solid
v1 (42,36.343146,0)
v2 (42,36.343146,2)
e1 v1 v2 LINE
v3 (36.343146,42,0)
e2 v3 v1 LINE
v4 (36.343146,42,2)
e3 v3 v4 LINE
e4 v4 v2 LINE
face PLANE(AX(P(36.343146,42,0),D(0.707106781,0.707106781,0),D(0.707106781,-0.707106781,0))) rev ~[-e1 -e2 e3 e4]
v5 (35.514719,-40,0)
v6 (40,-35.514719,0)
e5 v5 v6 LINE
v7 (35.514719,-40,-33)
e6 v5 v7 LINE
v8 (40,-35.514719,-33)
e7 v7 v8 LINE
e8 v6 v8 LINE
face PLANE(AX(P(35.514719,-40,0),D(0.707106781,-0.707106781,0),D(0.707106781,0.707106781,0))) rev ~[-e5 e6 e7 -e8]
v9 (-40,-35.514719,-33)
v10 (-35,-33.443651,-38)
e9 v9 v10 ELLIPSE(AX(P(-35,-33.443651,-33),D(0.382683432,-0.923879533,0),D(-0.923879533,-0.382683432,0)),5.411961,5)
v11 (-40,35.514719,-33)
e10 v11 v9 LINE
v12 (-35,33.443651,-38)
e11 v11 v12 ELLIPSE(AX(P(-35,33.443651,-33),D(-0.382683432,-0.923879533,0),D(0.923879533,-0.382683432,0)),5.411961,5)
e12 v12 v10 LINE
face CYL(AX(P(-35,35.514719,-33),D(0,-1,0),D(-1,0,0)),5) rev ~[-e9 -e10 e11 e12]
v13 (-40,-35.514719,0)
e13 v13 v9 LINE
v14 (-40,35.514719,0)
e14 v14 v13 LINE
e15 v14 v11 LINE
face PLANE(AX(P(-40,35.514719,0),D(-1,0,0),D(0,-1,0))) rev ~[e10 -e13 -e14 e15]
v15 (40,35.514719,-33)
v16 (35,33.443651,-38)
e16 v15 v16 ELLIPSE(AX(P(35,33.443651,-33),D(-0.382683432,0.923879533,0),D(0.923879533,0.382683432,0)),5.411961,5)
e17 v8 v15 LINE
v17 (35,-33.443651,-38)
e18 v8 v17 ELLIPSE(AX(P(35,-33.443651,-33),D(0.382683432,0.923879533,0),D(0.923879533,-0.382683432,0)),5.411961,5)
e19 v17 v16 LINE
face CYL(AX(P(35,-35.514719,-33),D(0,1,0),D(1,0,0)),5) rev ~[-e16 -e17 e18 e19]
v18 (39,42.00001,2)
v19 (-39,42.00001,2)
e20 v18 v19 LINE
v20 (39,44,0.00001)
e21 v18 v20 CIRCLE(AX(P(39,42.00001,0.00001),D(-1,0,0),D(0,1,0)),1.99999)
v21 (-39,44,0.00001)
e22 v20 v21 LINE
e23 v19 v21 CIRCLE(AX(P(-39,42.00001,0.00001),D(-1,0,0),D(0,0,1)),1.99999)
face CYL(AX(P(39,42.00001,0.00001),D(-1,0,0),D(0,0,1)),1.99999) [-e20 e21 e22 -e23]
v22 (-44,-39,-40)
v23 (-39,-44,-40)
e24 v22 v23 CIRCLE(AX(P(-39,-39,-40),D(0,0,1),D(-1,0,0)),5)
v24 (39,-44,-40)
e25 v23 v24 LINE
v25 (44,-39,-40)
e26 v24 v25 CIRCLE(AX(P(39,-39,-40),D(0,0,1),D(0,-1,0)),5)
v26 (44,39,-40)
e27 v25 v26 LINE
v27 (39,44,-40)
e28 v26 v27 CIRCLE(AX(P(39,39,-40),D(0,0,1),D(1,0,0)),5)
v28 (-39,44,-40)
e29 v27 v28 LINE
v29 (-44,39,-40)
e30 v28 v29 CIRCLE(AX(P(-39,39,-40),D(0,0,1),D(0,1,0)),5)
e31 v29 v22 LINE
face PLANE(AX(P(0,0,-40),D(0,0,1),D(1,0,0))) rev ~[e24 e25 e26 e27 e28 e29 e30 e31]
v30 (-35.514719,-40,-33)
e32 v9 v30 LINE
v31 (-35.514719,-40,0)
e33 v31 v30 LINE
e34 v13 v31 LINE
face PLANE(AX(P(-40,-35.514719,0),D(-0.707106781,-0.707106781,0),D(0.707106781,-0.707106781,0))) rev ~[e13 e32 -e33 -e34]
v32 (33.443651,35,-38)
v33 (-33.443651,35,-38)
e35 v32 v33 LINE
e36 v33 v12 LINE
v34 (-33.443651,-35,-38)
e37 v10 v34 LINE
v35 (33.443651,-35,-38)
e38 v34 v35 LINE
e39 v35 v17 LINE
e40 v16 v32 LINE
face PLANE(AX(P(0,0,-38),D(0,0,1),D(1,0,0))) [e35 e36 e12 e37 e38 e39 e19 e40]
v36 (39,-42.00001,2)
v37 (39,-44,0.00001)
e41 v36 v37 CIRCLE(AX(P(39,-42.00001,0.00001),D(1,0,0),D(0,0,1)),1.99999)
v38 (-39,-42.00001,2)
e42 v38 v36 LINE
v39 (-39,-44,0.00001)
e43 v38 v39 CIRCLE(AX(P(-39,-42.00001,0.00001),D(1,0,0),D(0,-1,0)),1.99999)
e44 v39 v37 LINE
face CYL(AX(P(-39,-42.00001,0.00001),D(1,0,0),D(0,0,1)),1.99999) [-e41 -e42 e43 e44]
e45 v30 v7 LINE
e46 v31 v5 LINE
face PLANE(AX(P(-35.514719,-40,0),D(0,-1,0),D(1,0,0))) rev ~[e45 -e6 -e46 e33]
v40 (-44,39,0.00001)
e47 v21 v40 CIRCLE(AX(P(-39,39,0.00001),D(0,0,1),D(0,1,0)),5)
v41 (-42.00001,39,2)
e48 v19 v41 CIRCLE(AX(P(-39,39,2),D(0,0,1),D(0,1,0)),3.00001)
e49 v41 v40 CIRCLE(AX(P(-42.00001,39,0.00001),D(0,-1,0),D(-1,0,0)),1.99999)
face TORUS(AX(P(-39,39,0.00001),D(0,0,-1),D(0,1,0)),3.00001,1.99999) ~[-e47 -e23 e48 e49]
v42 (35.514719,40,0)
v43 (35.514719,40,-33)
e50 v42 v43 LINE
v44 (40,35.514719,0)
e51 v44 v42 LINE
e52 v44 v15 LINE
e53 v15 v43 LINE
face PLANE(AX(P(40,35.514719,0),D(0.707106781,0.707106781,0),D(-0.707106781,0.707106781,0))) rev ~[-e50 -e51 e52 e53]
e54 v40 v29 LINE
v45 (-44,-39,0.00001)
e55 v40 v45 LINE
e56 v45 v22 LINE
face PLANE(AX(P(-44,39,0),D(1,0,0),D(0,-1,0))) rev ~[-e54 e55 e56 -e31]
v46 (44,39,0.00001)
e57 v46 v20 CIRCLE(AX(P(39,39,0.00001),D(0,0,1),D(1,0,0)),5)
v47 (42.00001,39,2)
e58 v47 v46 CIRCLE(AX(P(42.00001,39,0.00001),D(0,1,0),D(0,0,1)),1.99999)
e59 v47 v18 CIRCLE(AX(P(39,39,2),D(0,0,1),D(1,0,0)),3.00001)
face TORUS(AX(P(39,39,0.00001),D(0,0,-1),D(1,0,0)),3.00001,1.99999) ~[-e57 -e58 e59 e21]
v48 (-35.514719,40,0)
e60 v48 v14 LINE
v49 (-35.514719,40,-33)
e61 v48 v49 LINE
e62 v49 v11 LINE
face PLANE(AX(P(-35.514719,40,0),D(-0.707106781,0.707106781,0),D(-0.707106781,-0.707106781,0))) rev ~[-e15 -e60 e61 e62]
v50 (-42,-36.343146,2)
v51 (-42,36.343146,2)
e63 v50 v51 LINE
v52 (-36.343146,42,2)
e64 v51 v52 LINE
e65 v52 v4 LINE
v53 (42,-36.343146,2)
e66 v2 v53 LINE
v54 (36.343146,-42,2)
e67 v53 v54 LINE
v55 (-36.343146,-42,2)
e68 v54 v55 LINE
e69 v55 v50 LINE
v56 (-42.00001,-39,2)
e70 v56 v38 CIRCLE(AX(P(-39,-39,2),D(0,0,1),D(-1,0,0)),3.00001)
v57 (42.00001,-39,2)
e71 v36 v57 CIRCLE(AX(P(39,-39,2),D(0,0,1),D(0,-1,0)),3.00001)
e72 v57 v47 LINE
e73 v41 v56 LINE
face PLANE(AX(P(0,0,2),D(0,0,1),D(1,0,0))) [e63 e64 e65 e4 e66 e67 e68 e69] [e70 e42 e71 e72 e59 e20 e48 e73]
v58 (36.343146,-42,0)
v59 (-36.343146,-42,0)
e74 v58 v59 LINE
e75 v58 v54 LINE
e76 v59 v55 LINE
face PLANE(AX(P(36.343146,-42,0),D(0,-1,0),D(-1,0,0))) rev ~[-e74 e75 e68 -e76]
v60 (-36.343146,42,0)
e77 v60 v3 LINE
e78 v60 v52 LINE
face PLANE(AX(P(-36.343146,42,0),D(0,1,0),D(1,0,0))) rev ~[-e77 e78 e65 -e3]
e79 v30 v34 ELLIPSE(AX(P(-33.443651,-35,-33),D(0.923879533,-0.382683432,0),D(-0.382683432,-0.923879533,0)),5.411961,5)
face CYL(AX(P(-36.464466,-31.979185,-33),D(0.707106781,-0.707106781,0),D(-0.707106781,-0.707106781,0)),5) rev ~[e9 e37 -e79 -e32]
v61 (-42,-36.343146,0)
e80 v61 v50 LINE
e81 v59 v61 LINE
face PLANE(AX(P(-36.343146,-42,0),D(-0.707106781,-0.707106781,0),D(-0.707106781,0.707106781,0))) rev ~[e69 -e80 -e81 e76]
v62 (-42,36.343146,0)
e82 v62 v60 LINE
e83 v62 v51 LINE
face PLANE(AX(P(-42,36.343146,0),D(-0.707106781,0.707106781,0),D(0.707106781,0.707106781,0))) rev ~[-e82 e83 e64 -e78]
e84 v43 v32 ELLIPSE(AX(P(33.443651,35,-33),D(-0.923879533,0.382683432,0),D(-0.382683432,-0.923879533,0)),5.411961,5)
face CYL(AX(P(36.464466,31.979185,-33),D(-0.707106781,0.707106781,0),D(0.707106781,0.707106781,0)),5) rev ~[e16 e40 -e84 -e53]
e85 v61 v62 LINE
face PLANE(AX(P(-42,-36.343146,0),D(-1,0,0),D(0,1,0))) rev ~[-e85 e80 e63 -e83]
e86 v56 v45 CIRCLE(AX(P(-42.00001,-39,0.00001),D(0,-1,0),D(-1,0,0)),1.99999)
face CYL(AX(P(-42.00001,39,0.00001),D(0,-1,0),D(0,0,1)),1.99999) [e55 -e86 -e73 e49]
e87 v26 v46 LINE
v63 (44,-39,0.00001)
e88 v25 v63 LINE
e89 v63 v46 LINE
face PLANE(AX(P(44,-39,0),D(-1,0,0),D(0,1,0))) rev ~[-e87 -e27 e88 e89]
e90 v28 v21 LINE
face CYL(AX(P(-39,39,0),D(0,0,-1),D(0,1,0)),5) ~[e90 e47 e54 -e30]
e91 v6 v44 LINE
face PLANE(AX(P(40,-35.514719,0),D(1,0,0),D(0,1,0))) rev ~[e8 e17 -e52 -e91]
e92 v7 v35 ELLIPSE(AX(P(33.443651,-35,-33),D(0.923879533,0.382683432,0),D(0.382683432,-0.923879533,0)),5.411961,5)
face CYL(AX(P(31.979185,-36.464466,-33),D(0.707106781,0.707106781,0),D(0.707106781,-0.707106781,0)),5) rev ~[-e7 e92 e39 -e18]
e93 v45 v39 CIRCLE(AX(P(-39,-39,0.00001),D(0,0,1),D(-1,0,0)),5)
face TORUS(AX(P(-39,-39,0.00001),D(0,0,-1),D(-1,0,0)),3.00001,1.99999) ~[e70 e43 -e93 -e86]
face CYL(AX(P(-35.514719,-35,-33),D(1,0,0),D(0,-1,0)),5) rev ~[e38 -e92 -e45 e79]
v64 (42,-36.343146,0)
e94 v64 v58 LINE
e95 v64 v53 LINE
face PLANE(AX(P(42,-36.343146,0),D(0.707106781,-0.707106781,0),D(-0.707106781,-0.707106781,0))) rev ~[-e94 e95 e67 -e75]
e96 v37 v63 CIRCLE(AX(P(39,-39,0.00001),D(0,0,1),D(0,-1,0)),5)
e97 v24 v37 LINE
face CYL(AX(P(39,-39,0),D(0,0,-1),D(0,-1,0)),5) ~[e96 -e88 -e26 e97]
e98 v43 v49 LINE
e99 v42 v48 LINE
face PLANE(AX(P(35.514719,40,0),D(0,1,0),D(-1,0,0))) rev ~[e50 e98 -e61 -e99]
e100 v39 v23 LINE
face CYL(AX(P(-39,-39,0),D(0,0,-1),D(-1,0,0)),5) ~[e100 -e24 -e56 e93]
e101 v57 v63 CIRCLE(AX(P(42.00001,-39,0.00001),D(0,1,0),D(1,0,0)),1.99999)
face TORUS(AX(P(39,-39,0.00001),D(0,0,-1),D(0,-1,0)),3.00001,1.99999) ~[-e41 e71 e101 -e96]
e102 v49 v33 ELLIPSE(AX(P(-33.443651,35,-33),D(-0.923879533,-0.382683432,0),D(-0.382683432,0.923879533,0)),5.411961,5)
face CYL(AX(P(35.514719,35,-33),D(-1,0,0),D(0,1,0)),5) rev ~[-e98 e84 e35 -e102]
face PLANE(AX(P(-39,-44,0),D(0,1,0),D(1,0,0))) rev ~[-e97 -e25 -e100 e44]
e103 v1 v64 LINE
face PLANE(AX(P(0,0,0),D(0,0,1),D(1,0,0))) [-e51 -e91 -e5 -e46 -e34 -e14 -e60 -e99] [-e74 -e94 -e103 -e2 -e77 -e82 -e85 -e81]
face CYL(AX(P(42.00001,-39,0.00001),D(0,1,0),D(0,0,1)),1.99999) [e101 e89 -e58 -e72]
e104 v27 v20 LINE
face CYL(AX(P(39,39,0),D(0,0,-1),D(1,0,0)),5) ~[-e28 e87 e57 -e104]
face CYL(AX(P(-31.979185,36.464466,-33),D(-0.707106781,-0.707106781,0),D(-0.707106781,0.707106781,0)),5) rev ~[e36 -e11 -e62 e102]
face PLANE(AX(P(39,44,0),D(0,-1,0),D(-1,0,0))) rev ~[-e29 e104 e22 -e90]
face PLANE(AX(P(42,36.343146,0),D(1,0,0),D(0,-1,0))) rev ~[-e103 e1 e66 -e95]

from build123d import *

# Parameters (mm, degrees)
F1_DEPTH = 40
F2_DEPTH = 38
F3_DEPTH = 2
F4_R     = 1.99999
F5_R     = 5


# Not quite as in the source:
# - a fillet or chamfer is up to 0.001 mm smaller than in the source, because OpenCascade refuses the exact size


with BuildPart() as f1:
    # F0 (on Top) → F1 (new body)
    with BuildSketch(Plane.XY):
        with BuildLine():
            Line((-39, -44), (39, -44))
            ThreePointArc((39, -44), (42.5355339059, -42.5355339059), (44, -39))
            Line((44, -39), (44, 39))
            ThreePointArc((44, 39), (42.5355339059, 42.5355339059), (39, 44))
            Line((39, 44), (-39, 44))
            ThreePointArc((-39, 44), (-42.5355339059, 42.5355339059), (-44, 39))
            Line((-44, 39), (-44, -39))
            ThreePointArc((-44, -39), (-42.5355339059, -42.5355339059), (-39, -44))
        make_face()
        Polygon((42, -36.3431457505), (42, -42), (36.3431457505, -42), (-36.3431457505, -42), (-42, -42), (-42, -36.3431457505), (-42, 36.3431457505), (-42, 42), (-36.3431457505, 42), (36.3431457505, 42), (42, 42), (42, 36.3431457505), align=None, mode=Mode.SUBTRACT)
        Polygon((-35.5147186258, -40), (35.5147186258, -40), (40, -35.5147186258), (40, 35.5147186258), (35.5147186258, 40), (-35.5147186258, 40), (-40, 35.5147186258), (-40, -35.5147186258), align=None)
        Polygon((40, 35.5147186258), (40, 38.3431457505), (38.3431457505, 40), (35.5147186258, 40), align=None)
        Polygon((40, 38.3431457505), (42, 36.3431457505), (42, 42), (36.3431457505, 42), (38.3431457505, 40), (40, 40), align=None)
        Polygon((38.3431457505, 40), (40, 38.3431457505), (40, 40), align=None)
        Polygon((40, -38.3431457505), (42, -36.3431457505), (42, 36.3431457505), (40, 38.3431457505), (40, 35.5147186258), (40, -35.5147186258), align=None)
        Polygon((38.3431457505, 40), (36.3431457505, 42), (-36.3431457505, 42), (-38.3431457505, 40), (-35.5147186258, 40), (35.5147186258, 40), align=None)
        Polygon((-38.3431457505, 40), (-40, 38.3431457505), (-40, 35.5147186258), (-35.5147186258, 40), align=None)
        Polygon((-40, 40), (-40, 38.3431457505), (-38.3431457505, 40), align=None)
        Polygon((-42, 42), (-42, 36.3431457505), (-40, 38.3431457505), (-40, 40), (-38.3431457505, 40), (-36.3431457505, 42), align=None)
        Polygon((-42, 36.3431457505), (-42, -36.3431457505), (-40, -38.3431457505), (-40, -35.5147186258), (-40, 35.5147186258), (-40, 38.3431457505), align=None)
        Polygon((-40, -38.3431457505), (-38.3431457505, -40), (-35.5147186258, -40), (-40, -35.5147186258), align=None)
        Polygon((-40, -40), (-38.3431457505, -40), (-40, -38.3431457505), align=None)
        Polygon((-42, -42), (-36.3431457505, -42), (-38.3431457505, -40), (-40, -40), (-40, -38.3431457505), (-42, -36.3431457505), align=None)
        Polygon((-36.3431457505, -42), (36.3431457505, -42), (38.3431457505, -40), (35.5147186258, -40), (-35.5147186258, -40), (-38.3431457505, -40), align=None)
        Polygon((35.5147186258, -40), (38.3431457505, -40), (40, -38.3431457505), (40, -35.5147186258), align=None)
        Polygon((40, -38.3431457505), (38.3431457505, -40), (40, -40), align=None)
        Polygon((36.3431457505, -42), (42, -42), (42, -36.3431457505), (40, -38.3431457505), (40, -40), (38.3431457505, -40), align=None)
    extrude(amount=-F1_DEPTH)

    # F0 (on Top) → F2 (cut)
    with BuildSketch(Plane.XY):
        Polygon((-35.5147186258, -40), (35.5147186258, -40), (40, -35.5147186258), (40, 35.5147186258), (35.5147186258, 40), (-35.5147186258, 40), (-40, 35.5147186258), (-40, -35.5147186258), align=None)
    extrude(amount=-F2_DEPTH, mode=Mode.SUBTRACT)

    # F0 (on Top) → F3 (join)
    with BuildSketch(Plane.XY):
        with BuildLine():
            Line((-39, -44), (39, -44))
            ThreePointArc((39, -44), (42.5355339059, -42.5355339059), (44, -39))
            Line((44, -39), (44, 39))
            ThreePointArc((44, 39), (42.5355339059, 42.5355339059), (39, 44))
            Line((39, 44), (-39, 44))
            ThreePointArc((-39, 44), (-42.5355339059, 42.5355339059), (-44, 39))
            Line((-44, 39), (-44, -39))
            ThreePointArc((-44, -39), (-42.5355339059, -42.5355339059), (-39, -44))
        make_face()
        Polygon((42, -36.3431457505), (42, -42), (36.3431457505, -42), (-36.3431457505, -42), (-42, -42), (-42, -36.3431457505), (-42, 36.3431457505), (-42, 42), (-36.3431457505, 42), (36.3431457505, 42), (42, 42), (42, 36.3431457505), align=None, mode=Mode.SUBTRACT)
        Polygon((-42, 42), (-42, 36.3431457505), (-40, 38.3431457505), (-40, 40), (-38.3431457505, 40), (-36.3431457505, 42), align=None)
        Polygon((-40, 40), (-40, 38.3431457505), (-38.3431457505, 40), align=None)
        Polygon((40, 38.3431457505), (42, 36.3431457505), (42, 42), (36.3431457505, 42), (38.3431457505, 40), (40, 40), align=None)
        Polygon((38.3431457505, 40), (40, 38.3431457505), (40, 40), align=None)
        Polygon((36.3431457505, -42), (42, -42), (42, -36.3431457505), (40, -38.3431457505), (40, -40), (38.3431457505, -40), align=None)
        Polygon((40, -38.3431457505), (38.3431457505, -40), (40, -40), align=None)
        Polygon((-42, -42), (-36.3431457505, -42), (-38.3431457505, -40), (-40, -40), (-40, -38.3431457505), (-42, -36.3431457505), align=None)
        Polygon((-40, -40), (-38.3431457505, -40), (-40, -38.3431457505), align=None)
    extrude(amount=F3_DEPTH)

    # F4 (radius 2 in the source; OpenCascade refuses exactly that, so slightly less here)
    f4_edges = [f1.edges().sort_by_distance(p)[0] for p in [
        (-42.535534, -42.535534, 2),
    ]]
    fillet(f4_edges, radius=F4_R)

    # F5
    f5_edges = [f1.edges().sort_by_distance(p)[0] for p in [
        (0, 40, -38),
        (-40, 0, -38),
        (-37.757359, 37.757359, -38),
        (-37.757359, -37.757359, -38),
        (0, -40, -38),
        (37.757359, -37.757359, -38),
        (40, 0, -38),
        (37.757359, 37.757359, -38),
    ]]
    fillet(f5_edges, radius=F5_R)


solid = f1.part
